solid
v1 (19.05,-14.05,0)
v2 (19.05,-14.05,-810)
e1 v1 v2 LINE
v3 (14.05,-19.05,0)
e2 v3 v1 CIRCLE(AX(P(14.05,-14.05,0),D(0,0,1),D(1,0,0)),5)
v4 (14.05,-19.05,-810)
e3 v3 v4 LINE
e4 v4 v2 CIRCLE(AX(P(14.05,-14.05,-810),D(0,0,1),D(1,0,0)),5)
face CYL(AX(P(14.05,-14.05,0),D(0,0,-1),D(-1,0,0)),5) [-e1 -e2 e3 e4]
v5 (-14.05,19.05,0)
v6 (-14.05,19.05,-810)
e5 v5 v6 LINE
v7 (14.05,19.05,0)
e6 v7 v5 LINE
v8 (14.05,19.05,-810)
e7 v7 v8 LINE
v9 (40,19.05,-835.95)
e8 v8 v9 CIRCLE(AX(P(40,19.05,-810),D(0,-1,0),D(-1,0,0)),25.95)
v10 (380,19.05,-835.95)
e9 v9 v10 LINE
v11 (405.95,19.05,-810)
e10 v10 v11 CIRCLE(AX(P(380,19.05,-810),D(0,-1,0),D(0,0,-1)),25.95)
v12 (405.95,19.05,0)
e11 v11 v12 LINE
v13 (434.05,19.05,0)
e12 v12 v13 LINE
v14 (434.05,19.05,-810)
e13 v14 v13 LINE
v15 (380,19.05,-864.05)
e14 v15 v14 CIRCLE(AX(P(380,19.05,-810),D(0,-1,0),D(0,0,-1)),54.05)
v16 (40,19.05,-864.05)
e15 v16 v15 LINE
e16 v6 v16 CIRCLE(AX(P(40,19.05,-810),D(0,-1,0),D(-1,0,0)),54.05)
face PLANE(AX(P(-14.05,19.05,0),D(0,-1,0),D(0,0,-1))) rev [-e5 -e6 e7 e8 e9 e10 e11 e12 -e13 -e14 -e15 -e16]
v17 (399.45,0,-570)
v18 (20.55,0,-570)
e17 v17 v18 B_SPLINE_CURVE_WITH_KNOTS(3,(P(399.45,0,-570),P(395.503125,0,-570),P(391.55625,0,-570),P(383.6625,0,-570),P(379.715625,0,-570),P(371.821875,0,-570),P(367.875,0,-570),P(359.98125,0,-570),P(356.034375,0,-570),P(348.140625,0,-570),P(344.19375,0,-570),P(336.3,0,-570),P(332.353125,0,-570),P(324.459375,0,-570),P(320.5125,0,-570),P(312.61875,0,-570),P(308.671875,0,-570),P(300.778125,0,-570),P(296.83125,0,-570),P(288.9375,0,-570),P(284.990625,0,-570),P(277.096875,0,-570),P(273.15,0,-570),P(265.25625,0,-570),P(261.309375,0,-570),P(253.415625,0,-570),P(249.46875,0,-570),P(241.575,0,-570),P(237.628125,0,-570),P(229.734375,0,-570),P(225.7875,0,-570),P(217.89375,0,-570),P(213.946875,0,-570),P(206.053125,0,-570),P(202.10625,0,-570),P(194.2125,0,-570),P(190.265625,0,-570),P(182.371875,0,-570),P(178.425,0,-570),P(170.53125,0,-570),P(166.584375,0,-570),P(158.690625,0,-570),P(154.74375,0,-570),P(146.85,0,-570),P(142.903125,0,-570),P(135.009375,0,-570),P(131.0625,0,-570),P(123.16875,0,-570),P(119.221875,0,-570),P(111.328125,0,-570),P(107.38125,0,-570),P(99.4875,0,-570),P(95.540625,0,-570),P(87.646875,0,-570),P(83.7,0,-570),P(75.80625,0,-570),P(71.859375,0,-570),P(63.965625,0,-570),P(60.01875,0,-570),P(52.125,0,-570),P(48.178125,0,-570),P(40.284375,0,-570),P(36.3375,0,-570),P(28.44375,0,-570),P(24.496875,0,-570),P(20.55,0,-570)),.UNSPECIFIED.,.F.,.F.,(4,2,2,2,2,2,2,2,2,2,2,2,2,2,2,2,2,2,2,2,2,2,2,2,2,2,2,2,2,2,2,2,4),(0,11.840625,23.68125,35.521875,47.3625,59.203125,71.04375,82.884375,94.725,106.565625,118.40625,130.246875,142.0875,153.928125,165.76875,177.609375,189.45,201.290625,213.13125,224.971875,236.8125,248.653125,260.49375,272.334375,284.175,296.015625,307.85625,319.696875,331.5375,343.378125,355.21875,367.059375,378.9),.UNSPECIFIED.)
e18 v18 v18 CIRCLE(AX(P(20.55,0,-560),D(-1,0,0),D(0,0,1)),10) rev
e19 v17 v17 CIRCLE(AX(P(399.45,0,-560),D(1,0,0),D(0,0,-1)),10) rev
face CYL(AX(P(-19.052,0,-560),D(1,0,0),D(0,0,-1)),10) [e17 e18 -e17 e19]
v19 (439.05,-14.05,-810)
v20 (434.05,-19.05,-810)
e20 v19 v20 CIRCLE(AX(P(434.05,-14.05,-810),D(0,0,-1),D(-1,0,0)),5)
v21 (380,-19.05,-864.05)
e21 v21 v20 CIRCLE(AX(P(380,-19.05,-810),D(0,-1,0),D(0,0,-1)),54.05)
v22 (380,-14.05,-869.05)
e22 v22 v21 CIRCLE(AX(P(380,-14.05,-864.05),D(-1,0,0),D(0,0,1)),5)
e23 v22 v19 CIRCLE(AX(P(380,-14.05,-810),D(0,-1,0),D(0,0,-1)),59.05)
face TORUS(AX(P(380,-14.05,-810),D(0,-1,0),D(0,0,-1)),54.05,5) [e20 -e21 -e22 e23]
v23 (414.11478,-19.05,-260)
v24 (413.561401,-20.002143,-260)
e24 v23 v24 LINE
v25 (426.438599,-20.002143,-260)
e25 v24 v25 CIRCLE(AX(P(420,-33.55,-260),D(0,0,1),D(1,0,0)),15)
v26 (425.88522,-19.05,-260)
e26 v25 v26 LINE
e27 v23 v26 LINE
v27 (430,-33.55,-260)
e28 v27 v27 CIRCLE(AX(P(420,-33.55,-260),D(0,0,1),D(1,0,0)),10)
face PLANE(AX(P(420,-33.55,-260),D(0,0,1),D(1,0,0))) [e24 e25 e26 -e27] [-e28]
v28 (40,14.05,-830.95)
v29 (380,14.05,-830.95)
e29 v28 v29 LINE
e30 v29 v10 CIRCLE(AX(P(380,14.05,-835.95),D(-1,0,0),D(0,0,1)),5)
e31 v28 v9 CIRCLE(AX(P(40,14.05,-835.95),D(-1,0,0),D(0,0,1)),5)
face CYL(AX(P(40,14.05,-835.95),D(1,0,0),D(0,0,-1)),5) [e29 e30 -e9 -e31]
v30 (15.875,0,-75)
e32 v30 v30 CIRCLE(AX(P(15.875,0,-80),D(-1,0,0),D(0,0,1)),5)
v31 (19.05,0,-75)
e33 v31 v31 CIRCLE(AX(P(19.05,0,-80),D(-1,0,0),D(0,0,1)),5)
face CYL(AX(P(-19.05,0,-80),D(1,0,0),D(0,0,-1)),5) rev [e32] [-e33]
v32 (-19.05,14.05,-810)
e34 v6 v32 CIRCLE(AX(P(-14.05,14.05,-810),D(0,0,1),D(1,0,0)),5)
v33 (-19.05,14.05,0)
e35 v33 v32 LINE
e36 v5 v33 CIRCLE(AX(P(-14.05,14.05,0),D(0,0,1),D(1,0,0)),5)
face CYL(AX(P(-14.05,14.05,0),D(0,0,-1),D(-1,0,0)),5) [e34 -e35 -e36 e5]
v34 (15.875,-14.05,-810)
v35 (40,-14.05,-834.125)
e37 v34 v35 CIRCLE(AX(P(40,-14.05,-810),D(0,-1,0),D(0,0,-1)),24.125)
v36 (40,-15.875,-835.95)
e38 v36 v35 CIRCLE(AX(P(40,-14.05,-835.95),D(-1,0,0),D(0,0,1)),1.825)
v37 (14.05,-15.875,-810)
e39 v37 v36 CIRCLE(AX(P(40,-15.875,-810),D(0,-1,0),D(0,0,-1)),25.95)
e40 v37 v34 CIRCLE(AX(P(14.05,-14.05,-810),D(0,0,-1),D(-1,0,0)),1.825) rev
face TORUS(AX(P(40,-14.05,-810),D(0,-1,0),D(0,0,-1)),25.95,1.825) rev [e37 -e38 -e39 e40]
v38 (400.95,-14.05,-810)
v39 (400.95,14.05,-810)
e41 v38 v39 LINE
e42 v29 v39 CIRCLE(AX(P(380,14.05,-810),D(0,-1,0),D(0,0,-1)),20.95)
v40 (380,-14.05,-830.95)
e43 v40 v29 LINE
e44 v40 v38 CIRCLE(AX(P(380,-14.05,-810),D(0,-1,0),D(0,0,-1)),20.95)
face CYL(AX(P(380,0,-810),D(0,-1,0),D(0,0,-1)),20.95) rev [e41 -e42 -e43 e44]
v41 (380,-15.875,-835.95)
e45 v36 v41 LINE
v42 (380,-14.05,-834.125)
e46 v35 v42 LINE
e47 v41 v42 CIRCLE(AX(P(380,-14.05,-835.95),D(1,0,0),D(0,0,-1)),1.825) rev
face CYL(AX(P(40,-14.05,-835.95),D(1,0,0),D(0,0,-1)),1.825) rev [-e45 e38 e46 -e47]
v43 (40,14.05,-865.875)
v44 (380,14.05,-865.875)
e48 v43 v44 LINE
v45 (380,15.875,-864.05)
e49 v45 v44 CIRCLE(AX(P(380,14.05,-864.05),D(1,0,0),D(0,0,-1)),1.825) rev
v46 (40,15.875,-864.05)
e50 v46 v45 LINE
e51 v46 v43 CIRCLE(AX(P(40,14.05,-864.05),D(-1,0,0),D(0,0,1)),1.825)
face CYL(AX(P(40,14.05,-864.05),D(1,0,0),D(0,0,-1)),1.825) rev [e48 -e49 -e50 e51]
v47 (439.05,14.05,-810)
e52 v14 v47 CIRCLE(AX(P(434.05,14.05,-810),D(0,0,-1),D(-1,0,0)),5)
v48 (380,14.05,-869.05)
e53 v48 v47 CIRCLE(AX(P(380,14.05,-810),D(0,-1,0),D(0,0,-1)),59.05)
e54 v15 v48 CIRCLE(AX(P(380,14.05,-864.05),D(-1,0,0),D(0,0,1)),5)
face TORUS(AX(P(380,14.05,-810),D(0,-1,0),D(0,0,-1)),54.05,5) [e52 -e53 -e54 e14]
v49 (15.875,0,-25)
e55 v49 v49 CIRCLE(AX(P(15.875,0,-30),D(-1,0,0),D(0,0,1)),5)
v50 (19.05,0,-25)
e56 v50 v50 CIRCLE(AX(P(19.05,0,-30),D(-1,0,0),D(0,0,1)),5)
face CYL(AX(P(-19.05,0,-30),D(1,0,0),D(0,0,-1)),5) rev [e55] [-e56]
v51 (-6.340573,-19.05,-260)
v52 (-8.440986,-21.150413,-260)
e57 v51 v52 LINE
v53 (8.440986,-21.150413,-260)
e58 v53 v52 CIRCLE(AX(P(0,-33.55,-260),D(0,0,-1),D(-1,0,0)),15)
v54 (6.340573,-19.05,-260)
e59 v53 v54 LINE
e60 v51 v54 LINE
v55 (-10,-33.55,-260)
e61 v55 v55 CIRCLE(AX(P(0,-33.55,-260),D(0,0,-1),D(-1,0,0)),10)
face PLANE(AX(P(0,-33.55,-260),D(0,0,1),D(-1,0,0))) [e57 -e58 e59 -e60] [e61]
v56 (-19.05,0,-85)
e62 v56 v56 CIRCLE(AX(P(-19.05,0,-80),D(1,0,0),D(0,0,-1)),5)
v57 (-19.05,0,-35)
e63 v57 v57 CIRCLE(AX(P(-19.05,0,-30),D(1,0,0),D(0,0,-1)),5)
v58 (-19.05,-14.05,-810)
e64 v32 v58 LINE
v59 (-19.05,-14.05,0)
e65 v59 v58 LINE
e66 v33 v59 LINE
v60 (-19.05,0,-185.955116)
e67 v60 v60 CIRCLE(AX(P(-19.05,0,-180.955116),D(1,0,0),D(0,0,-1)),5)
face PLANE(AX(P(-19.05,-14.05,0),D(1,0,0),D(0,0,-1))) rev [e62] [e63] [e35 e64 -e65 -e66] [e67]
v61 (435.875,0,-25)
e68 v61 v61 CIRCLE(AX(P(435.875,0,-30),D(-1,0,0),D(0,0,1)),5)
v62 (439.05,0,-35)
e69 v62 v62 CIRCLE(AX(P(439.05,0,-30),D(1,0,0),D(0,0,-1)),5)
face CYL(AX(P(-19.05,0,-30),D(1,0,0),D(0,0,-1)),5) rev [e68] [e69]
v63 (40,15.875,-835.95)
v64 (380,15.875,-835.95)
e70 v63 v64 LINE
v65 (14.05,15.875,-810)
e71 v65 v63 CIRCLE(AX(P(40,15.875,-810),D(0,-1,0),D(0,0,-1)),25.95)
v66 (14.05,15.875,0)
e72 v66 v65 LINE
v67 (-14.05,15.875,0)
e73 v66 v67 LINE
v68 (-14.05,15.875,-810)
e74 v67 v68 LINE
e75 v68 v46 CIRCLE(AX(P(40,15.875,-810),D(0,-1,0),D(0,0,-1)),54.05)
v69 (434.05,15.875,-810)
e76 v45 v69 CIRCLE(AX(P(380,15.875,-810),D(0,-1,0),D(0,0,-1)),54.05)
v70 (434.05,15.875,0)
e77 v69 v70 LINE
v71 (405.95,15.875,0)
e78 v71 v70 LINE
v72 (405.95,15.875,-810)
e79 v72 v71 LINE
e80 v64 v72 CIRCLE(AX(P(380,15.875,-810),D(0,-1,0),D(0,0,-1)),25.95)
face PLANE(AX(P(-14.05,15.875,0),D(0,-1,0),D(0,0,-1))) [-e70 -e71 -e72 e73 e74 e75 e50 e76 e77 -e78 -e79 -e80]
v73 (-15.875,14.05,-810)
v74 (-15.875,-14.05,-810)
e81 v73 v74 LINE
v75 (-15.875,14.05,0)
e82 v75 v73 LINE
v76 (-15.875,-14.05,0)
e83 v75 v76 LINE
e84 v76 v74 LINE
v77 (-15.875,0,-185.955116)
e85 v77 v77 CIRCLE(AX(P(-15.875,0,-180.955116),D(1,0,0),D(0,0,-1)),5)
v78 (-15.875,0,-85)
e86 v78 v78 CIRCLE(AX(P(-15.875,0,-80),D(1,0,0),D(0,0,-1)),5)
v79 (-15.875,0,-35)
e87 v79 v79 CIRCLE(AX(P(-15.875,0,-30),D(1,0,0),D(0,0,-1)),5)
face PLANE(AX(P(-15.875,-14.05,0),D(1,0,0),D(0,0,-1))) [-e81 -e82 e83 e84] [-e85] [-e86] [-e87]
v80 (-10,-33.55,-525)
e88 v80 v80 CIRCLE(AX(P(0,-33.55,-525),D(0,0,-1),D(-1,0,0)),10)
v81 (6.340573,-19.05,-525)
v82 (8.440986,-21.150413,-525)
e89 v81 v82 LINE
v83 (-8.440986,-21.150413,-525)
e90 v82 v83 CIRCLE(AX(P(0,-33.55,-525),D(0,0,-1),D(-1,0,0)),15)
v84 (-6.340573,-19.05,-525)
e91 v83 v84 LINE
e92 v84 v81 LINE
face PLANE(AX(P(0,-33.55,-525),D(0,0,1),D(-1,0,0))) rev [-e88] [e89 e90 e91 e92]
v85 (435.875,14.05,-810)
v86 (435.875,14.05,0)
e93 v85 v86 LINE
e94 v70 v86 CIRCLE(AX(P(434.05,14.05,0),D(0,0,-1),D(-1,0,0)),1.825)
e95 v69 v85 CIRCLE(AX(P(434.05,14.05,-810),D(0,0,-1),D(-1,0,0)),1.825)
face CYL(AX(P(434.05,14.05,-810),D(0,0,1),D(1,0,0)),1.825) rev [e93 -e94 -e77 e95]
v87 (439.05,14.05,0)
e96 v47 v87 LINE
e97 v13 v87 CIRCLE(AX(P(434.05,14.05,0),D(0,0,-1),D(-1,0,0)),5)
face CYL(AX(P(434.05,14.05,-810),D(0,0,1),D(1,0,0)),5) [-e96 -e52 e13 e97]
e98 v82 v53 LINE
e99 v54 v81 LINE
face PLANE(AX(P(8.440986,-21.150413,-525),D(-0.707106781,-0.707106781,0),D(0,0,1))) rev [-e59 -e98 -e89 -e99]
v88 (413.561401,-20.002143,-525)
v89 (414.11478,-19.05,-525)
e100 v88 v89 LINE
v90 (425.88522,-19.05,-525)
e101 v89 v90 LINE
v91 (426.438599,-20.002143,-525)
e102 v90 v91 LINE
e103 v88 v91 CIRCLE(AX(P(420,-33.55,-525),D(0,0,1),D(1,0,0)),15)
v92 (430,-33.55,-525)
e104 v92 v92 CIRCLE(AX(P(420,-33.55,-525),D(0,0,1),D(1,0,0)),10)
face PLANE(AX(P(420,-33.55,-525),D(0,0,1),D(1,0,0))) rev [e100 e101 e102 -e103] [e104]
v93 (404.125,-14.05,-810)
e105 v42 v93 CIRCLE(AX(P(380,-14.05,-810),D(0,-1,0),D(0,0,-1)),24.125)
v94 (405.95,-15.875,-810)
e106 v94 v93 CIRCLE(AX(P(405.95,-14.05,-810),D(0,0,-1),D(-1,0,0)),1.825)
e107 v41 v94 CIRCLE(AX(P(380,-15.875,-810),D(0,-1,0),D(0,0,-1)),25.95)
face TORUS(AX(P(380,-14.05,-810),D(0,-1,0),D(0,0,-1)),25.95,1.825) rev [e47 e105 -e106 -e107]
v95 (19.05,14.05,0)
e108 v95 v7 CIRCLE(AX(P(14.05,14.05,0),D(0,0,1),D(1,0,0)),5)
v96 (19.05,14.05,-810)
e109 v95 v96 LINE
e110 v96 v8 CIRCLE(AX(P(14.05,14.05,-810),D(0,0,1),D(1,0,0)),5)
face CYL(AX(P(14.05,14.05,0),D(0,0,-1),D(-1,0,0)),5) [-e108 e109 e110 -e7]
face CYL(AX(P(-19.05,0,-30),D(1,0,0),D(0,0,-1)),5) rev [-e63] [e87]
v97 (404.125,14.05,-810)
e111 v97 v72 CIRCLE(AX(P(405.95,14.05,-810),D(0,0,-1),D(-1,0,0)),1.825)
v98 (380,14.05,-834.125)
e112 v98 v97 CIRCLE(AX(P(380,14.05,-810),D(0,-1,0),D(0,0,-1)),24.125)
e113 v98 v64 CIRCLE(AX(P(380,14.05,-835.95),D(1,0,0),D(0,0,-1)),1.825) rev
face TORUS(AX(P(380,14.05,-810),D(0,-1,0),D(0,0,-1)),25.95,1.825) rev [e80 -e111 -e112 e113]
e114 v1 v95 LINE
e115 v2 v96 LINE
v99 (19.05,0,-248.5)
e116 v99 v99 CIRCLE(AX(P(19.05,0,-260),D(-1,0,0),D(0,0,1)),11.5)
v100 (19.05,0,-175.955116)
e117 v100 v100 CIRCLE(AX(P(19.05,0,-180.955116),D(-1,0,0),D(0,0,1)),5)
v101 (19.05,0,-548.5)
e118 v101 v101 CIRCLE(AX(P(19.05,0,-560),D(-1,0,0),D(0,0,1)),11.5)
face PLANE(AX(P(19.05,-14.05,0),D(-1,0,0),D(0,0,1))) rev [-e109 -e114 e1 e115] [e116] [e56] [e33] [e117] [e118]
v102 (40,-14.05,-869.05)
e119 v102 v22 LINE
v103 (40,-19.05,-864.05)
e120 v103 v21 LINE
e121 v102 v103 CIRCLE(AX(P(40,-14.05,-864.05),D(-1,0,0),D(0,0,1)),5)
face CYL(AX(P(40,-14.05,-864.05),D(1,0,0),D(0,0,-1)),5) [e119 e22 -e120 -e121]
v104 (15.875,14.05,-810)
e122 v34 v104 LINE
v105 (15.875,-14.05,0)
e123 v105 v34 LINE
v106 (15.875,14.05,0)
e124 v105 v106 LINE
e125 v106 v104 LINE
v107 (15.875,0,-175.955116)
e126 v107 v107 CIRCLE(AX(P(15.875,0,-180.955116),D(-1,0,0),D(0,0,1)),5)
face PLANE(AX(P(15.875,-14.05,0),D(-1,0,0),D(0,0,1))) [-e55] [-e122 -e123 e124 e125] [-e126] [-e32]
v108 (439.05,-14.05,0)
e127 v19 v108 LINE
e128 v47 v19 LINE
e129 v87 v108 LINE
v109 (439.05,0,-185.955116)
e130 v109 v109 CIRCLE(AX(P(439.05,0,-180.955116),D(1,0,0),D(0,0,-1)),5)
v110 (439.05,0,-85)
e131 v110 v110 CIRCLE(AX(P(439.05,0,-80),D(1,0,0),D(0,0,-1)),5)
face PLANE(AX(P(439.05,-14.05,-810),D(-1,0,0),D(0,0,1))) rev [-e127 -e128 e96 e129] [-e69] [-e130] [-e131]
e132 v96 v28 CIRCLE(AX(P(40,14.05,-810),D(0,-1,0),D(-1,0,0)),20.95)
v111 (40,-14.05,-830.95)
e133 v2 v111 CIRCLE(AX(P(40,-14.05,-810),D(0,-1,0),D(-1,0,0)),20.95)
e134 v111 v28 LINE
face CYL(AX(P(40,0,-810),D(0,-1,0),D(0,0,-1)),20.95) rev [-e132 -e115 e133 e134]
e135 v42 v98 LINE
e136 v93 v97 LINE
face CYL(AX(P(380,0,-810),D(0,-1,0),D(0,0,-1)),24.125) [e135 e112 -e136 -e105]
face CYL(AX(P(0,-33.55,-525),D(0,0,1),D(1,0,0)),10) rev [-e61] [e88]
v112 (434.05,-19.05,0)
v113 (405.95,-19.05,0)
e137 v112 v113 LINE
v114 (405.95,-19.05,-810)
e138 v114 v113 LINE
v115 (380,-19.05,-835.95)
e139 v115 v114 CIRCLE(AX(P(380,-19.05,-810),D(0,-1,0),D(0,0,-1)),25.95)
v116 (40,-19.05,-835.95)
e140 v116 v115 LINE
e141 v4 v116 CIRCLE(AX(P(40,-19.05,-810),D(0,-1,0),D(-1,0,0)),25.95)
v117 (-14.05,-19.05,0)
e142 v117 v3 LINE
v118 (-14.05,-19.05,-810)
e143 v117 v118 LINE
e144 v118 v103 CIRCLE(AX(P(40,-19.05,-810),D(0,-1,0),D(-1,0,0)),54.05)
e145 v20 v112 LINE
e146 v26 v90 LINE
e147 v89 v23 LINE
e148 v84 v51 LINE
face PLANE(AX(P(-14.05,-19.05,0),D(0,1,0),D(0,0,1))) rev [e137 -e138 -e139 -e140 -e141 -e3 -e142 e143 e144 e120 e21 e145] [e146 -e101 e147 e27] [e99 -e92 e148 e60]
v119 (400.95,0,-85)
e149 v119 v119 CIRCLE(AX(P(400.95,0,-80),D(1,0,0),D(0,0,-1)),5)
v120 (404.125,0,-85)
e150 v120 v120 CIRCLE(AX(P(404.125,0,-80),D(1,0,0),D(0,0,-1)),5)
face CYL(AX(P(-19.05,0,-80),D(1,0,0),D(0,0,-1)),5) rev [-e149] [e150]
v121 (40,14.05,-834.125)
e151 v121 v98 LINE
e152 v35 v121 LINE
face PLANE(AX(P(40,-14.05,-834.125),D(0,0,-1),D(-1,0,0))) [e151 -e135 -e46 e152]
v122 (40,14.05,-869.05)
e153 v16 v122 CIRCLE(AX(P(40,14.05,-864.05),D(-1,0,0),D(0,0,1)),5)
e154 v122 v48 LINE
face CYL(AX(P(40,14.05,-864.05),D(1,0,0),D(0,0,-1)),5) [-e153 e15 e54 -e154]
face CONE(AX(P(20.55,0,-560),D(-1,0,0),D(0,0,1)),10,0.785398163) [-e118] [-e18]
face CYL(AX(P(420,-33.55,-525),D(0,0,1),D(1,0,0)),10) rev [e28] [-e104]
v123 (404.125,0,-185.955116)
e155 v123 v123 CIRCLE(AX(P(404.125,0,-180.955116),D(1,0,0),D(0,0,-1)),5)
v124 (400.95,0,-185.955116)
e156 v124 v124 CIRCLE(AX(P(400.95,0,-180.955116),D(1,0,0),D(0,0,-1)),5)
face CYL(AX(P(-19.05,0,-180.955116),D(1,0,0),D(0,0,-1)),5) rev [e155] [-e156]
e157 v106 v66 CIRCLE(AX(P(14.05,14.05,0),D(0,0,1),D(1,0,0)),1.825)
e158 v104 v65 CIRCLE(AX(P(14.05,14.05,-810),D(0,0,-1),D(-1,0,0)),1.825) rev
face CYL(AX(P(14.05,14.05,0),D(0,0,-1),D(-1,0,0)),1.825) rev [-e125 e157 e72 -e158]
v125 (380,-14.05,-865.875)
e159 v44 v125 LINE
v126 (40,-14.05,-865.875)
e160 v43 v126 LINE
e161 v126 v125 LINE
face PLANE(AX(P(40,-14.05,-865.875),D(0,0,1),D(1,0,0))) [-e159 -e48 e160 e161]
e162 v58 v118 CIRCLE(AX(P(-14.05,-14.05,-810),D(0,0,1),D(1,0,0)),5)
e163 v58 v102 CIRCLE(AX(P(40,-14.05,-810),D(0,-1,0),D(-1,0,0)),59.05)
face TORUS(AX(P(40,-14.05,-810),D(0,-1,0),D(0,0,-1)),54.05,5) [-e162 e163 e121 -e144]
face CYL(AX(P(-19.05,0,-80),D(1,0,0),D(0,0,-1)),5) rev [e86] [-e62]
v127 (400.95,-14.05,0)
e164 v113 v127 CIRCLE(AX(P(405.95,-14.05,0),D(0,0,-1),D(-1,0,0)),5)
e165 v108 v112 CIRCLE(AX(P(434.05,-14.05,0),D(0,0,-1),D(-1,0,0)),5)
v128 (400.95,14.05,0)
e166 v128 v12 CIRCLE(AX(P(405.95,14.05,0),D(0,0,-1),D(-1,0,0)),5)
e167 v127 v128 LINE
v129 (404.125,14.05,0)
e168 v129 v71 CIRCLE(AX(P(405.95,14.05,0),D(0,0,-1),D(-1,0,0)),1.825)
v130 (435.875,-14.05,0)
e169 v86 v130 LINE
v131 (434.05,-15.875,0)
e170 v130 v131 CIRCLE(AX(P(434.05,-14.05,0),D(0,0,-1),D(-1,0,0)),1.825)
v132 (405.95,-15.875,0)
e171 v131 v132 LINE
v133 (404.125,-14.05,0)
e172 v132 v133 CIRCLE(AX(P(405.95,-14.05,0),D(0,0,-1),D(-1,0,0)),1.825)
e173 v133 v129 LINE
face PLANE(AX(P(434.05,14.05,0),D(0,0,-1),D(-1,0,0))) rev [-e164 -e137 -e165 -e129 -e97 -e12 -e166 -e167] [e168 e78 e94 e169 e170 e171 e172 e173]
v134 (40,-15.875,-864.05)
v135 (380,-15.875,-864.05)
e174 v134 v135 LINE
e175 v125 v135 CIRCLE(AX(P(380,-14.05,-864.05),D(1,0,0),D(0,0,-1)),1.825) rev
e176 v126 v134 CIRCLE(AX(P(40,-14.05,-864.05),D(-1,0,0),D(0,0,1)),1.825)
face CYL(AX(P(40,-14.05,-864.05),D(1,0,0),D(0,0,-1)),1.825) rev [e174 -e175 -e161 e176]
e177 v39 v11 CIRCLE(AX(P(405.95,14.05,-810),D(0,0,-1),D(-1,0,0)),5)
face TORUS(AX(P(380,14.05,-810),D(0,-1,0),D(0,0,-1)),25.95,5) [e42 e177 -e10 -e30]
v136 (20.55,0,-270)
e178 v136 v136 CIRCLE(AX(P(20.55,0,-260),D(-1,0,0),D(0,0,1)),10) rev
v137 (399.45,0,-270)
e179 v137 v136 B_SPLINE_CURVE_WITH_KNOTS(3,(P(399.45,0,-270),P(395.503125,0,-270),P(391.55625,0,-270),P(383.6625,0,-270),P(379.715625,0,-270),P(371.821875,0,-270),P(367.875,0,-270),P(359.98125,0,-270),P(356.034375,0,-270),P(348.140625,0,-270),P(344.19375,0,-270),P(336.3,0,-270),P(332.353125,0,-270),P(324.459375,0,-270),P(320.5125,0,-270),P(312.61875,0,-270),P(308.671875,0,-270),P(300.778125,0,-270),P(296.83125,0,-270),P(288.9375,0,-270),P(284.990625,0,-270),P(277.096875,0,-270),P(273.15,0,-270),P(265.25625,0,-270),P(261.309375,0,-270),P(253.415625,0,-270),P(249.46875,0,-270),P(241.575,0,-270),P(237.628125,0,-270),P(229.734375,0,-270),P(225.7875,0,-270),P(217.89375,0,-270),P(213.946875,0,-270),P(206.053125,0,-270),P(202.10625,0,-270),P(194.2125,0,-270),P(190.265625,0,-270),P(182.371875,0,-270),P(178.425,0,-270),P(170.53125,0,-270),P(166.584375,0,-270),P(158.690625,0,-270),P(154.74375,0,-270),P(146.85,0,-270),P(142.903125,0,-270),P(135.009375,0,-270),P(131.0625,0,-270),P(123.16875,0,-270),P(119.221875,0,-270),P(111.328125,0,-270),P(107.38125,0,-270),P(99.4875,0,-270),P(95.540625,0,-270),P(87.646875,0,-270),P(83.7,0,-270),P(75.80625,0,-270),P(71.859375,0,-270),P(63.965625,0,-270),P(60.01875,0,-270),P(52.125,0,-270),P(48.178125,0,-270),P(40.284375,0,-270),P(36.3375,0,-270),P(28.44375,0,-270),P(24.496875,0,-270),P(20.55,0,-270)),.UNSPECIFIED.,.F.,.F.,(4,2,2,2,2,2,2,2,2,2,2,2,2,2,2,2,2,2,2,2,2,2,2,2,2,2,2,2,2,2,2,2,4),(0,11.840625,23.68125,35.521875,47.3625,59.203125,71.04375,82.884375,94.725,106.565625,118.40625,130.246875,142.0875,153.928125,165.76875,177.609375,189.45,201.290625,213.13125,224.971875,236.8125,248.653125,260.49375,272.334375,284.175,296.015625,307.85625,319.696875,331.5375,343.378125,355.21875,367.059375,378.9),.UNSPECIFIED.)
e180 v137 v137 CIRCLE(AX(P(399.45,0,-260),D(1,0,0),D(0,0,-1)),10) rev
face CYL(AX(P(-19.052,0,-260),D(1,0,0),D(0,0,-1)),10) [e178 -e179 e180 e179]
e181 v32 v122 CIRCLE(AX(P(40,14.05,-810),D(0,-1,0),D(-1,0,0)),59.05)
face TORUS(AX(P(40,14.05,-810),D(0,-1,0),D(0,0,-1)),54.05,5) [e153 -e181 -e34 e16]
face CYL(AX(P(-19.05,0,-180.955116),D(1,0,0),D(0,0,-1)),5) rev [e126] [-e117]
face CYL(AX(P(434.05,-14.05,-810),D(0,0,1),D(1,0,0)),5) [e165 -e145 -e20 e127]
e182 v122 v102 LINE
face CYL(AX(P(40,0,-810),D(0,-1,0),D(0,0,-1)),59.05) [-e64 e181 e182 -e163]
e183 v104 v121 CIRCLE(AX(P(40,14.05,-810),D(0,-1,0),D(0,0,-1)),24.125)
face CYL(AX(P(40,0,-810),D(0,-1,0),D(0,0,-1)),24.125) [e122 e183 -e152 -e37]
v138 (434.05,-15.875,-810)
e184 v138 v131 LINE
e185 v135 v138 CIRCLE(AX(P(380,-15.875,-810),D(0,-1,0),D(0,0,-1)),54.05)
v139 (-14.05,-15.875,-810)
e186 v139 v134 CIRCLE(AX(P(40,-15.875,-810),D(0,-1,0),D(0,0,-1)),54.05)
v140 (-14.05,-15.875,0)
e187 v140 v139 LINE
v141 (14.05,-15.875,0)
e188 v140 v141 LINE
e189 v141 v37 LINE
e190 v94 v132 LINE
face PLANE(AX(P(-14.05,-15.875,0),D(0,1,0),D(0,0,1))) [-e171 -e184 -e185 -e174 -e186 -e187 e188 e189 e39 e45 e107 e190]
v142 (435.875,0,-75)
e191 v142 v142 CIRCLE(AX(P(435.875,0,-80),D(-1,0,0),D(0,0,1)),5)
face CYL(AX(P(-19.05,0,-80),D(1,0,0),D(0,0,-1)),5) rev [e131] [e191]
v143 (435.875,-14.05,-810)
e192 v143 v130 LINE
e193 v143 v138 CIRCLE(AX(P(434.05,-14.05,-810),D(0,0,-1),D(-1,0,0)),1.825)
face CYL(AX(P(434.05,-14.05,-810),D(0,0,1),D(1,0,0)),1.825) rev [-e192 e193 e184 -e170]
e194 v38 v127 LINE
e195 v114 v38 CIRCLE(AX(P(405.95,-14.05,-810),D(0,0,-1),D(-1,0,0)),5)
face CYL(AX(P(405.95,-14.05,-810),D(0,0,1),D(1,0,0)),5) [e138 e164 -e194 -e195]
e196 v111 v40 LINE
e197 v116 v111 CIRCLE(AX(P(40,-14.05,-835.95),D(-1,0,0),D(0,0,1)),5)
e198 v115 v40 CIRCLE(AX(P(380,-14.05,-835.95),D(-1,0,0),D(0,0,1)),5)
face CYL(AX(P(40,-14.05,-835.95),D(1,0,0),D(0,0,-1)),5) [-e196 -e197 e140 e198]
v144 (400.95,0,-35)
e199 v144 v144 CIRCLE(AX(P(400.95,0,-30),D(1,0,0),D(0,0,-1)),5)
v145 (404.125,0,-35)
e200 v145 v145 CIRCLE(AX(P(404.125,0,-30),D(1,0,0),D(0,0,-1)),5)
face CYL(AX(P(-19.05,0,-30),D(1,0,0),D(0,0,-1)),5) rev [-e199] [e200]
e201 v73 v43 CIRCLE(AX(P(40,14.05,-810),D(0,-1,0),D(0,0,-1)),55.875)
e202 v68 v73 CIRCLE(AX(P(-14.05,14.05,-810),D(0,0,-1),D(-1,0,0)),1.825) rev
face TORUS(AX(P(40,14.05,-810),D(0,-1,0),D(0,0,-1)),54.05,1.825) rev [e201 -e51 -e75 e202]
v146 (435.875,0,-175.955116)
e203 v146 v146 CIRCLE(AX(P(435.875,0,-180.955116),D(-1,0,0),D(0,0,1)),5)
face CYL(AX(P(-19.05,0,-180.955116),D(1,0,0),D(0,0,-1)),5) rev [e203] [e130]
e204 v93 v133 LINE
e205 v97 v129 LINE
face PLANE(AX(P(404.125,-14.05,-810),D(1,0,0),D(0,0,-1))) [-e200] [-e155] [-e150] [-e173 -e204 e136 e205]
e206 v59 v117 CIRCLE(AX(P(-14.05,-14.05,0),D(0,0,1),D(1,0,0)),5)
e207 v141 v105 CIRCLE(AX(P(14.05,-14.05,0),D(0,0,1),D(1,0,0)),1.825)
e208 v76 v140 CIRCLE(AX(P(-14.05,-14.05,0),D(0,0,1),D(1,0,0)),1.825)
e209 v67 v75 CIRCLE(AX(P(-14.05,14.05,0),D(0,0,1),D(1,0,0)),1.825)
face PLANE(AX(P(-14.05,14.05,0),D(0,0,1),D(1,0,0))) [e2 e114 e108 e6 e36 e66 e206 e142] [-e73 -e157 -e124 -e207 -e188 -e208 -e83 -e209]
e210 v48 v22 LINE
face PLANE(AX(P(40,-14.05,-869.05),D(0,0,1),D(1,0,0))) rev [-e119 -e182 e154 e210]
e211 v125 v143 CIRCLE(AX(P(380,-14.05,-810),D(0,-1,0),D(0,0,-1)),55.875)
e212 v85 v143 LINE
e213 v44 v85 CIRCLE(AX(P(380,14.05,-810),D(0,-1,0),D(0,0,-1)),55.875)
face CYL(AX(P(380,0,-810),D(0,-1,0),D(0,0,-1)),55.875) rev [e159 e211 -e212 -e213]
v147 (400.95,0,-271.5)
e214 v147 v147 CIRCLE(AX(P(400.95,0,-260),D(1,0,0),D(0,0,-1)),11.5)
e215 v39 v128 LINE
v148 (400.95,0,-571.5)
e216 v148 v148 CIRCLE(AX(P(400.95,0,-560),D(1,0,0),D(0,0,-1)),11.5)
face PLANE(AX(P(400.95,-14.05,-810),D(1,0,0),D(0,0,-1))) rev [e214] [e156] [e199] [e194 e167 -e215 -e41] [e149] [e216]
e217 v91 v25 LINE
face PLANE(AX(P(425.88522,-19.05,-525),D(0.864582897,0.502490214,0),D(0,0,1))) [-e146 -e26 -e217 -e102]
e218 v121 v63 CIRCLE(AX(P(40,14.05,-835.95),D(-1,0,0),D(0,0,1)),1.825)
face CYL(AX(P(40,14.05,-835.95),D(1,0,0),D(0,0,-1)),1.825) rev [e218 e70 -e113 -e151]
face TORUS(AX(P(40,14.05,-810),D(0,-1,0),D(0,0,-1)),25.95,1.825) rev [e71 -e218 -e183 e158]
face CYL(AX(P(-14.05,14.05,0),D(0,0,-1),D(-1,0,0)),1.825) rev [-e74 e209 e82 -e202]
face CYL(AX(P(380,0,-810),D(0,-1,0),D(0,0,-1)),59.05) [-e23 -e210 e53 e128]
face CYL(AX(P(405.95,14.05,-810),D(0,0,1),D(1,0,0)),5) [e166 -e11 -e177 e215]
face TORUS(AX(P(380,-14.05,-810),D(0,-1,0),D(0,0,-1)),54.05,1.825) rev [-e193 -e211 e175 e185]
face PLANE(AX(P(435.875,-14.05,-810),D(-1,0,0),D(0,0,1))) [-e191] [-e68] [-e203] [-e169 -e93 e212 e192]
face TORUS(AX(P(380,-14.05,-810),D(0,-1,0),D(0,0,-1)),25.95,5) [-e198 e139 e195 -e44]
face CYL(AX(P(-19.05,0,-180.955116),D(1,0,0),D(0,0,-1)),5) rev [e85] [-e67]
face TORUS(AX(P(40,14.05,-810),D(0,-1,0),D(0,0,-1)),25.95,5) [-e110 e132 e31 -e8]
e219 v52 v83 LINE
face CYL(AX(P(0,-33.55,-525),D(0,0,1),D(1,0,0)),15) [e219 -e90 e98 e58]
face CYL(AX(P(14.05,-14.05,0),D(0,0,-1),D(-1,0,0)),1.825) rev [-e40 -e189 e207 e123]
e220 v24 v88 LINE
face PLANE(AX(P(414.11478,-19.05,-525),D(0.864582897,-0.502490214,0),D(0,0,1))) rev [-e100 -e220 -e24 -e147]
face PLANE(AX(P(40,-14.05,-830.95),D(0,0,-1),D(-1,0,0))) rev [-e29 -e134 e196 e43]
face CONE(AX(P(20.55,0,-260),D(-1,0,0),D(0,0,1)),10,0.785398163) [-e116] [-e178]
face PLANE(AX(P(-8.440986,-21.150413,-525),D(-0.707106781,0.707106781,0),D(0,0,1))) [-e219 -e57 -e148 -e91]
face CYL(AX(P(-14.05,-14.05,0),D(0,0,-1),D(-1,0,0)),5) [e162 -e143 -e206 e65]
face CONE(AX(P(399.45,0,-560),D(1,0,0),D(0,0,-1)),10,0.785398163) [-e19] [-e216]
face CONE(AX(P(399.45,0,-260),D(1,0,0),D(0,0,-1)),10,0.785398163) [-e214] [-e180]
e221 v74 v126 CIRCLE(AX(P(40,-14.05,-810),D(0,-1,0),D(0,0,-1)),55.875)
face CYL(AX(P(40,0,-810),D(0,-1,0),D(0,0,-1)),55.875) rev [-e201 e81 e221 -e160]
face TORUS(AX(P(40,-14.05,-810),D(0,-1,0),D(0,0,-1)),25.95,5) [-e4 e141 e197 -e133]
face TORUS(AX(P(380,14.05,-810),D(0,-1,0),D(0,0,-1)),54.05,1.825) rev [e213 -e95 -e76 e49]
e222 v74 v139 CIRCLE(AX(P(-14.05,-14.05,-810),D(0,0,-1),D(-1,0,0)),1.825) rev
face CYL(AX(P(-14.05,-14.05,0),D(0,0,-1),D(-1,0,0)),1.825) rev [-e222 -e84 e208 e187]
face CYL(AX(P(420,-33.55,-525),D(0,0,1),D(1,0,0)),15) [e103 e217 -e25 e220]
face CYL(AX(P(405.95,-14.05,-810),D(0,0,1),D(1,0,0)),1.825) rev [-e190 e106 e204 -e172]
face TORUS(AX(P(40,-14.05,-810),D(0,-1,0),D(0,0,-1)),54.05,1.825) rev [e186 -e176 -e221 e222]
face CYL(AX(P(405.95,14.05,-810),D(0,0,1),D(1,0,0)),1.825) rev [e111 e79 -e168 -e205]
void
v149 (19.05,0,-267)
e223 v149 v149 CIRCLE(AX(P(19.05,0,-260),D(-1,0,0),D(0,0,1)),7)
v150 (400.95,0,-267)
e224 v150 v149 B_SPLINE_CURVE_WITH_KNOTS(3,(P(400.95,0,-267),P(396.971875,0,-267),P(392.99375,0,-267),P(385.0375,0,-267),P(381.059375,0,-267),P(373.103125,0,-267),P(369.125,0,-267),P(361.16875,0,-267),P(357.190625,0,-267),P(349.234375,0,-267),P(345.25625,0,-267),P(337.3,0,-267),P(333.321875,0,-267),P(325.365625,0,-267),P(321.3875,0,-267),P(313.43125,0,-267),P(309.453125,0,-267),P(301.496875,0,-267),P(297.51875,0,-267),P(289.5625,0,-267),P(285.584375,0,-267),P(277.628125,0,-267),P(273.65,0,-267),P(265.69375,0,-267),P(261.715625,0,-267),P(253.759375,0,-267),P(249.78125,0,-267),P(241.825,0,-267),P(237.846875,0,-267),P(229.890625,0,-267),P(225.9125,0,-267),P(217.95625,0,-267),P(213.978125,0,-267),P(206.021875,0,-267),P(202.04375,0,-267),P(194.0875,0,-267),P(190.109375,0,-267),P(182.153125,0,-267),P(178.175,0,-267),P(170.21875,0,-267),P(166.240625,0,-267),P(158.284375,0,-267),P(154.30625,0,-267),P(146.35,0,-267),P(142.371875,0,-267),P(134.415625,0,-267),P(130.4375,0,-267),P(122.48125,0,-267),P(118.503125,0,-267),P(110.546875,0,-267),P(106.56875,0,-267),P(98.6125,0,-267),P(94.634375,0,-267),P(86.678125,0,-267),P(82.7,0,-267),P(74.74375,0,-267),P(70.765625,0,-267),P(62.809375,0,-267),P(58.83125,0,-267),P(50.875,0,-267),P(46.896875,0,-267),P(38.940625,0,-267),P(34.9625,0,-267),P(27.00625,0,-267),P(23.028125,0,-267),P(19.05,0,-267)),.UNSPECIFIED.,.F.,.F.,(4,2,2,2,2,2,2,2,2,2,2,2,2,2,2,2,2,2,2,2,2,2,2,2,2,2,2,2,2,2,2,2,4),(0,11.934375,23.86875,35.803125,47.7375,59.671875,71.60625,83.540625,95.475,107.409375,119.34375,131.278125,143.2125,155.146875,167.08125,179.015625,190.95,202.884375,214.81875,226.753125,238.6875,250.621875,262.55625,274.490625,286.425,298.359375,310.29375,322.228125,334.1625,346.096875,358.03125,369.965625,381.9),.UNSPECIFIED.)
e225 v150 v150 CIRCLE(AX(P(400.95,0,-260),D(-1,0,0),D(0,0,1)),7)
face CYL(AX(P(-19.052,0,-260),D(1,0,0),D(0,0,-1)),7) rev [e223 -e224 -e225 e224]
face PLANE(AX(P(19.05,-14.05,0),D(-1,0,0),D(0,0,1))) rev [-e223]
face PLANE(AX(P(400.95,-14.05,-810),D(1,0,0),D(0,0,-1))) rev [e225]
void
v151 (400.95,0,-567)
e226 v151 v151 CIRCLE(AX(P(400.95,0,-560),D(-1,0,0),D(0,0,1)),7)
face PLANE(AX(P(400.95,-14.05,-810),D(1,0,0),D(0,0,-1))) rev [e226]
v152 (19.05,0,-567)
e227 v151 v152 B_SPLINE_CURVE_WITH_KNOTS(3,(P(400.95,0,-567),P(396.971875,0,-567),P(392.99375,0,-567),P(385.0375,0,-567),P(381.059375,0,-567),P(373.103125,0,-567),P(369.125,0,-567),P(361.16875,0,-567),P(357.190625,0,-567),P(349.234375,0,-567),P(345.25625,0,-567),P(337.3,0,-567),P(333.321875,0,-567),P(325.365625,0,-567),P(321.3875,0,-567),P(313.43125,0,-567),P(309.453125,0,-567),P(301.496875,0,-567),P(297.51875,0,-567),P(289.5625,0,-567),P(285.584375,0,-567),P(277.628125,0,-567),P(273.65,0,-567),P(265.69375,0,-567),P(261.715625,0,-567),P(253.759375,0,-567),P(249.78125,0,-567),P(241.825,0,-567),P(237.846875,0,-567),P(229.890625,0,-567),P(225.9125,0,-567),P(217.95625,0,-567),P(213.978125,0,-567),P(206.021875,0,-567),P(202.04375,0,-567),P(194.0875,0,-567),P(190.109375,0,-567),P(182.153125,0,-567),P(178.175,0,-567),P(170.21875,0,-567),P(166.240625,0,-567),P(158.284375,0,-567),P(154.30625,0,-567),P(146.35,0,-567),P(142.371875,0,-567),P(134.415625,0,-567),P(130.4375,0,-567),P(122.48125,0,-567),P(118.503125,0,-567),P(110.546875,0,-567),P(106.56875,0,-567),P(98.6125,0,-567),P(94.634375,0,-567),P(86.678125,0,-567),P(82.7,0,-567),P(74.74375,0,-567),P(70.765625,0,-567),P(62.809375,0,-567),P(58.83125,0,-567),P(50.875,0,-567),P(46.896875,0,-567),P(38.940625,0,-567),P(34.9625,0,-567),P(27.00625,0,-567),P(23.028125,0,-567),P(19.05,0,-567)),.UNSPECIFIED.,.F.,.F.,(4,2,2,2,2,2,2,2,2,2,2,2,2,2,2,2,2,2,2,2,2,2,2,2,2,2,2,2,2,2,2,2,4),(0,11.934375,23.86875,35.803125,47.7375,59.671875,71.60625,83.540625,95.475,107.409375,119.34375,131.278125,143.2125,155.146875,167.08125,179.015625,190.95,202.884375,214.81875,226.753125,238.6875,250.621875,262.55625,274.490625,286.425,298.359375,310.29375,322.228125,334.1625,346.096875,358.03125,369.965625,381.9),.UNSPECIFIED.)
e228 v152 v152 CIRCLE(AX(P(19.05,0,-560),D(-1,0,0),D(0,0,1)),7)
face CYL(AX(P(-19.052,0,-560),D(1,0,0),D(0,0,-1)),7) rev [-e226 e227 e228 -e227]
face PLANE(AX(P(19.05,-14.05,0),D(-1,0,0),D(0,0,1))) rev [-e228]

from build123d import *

# Parameters (mm, degrees)
CUT_EXTRUDE2_DEPTH      = 974.845833675
CUT_EXTRUDE2_DEPTH_BACK = 974.845833675
SKETCH4_R               = 5
BOSS_EXTRUDE1_REACH     = 967.407
SKETCH10_R              = 10
SKETCH10_R_2            = 7
CHAMFER1_SIZE           = 1.5
SKETCH24_R              = 15
SKETCH24_R_2            = 10
BOSS_EXTRUDE2_DEPTH     = 265
CHAMFER2_SIZE           = 2.044647147
MIRROR1_START           = -525
MIRROR1_OUTLINE_R       = 10
MIRROR1_DEPTH           = 265


with BuildPart() as part:
    # Sweep-Thin1: sweep along a path in Sketch1
    with BuildLine(Plane(origin=(0, 0, 0), x_dir=(1, 0, 0), z_dir=(0, 1, 0))) as sweep_thin1_path:
        Line((0, 0), (0, 810))
        ThreePointArc((0, 810), (11.715728753, 838.284271247), (40, 850))
        Line((40, 850), (380, 850))
        ThreePointArc((380, 850), (408.284271247, 838.284271247), (420, 810))
        Line((420, 810), (420, 0))
    # Sketch3 → Sweep-Thin1 (sweep)
    with BuildSketch(Plane.XY):
        with BuildLine():
            Line((14.05, 19.05), (-14.05, 19.05))
            ThreePointArc((-14.05, 19.05), (-17.585533906, 17.585533906), (-19.05, 14.05))
            Line((-19.05, 14.05), (-19.05, -14.05))
            ThreePointArc((-19.05, -14.05), (-17.585533906, -17.585533906), (-14.05, -19.05))
            Line((-14.05, -19.05), (14.05, -19.05))
            ThreePointArc((14.05, -19.05), (17.585533906, -17.585533906), (19.05, -14.05))
            Line((19.05, -14.05), (19.05, 14.05))
            ThreePointArc((19.05, 14.05), (17.585533906, 17.585533906), (14.05, 19.05))
        make_face()
        with BuildLine():
            Line((14.05, 15.875), (-14.05, 15.875))
            ThreePointArc((-14.05, 15.875), (-15.340469876, 15.340469876), (-15.875, 14.05))
            Line((-15.875, 14.05), (-15.875, -14.05))
            ThreePointArc((-15.875, -14.05), (-15.340469876, -15.340469876), (-14.05, -15.875))
            Line((-14.05, -15.875), (14.05, -15.875))
            ThreePointArc((14.05, -15.875), (15.340469876, -15.340469876), (15.875, -14.05))
            Line((15.875, -14.05), (15.875, 14.05))
            ThreePointArc((15.875, 14.05), (15.340469876, 15.340469876), (14.05, 15.875))
        make_face(mode=Mode.SUBTRACT)
    sweep(path=sweep_thin1_path.line)

    # Sketch4 → Cut-Extrude2 (cut, two sides: drawn at the far end of the back side and taken through both)
    with BuildSketch(Plane(origin=(0, 0, 0), x_dir=(0, 0, -1), z_dir=(1, 0, 0)).offset(-CUT_EXTRUDE2_DEPTH_BACK)):
        with Locations((30, 0)):
            Circle(SKETCH4_R)
        with Locations((80, 0)):
            Circle(SKETCH4_R)
        with Locations((180.955115779, 0)):
            Circle(SKETCH4_R)
    extrude(amount=CUT_EXTRUDE2_DEPTH + CUT_EXTRUDE2_DEPTH_BACK, mode=Mode.SUBTRACT)

    # Sketch10 → Boss-Extrude1 (add, up to next)
    with BuildSketch(Plane.ZY.offset(-400.95), mode=Mode.PRIVATE) as boss_extrude1_sk1:
        with Locations(Location((-560, 0, 0), (0, 0, 180))):
            Circle(SKETCH10_R)
        with Locations(Location((-560, 0, 0), (0, 0, 180))):
            Circle(SKETCH10_R_2, mode=Mode.SUBTRACT)
    boss_extrude1_tool1 = extrude(boss_extrude1_sk1.sketch, amount=BOSS_EXTRUDE1_REACH, mode=Mode.PRIVATE) - part.part
    # Sketch10 → Boss-Extrude1 (add, up to next)
    with BuildSketch(Plane.ZY.offset(-400.95), mode=Mode.PRIVATE) as boss_extrude1_sk2:
        with Locations(Location((-260, 0, 0), (0, 0, 180))):
            Circle(SKETCH10_R)
        with Locations(Location((-260, 0, 0), (0, 0, 180))):
            Circle(SKETCH10_R_2, mode=Mode.SUBTRACT)
    boss_extrude1_tool2 = extrude(boss_extrude1_sk2.sketch, amount=BOSS_EXTRUDE1_REACH, mode=Mode.PRIVATE) - part.part
    add(boss_extrude1_tool1.solids().sort_by_distance((400.95, 0, -550.282843))[0])
    add(boss_extrude1_tool2.solids().sort_by_distance((400.95, 0, -250.282843))[0])

    # Chamfer1
    chamfer1_edges = [part.edges().sort_by_distance(p)[0] for p in [
        (400.95, 0, -550),
        (19.05, 0, -550),
        (400.95, 0, -250),
        (19.05, 0, -250),
    ]]
    chamfer(chamfer1_edges, length=CHAMFER1_SIZE)

    # Sketch24 → Boss-Extrude2 (add)
    with BuildSketch(Plane.XY.offset(-260)):
        with Locations((420, -33.55)):
            Circle(SKETCH24_R)
        with Locations((420, -33.55)):
            Circle(SKETCH24_R_2, mode=Mode.SUBTRACT)
    extrude(amount=-BOSS_EXTRUDE2_DEPTH)

    # Chamfer2
    # the kernel refuses this chamfer: 2.5, 2.044647147 mm, written as the material it adds along each edge
    with BuildSketch(Plane(origin=(423.840572874, -19.05, -525), x_dir=(1, 0, 0), z_dir=(0, 0, 1))) as chamfer2_piece_1:
        with BuildLine():
            Line((CHAMFER2_SIZE, 0), (2.598026583, -0.952142714))
            ThreePointArc((2.598026583, -0.952142714), (1.357346607, -0.429405376), (0, 0))
            Line((0, 0), (CHAMFER2_SIZE, 0))
        make_face()
    extrude(amount=265)
    with BuildSketch(Plane(origin=(416.159427126, -19.05, -525), x_dir=(-1, 0, 0), z_dir=(0, 0, 1))) as chamfer2_piece_2:
        with BuildLine():
            Line((CHAMFER2_SIZE, 0), (2.598026583, 0.952142714))
            ThreePointArc((2.598026583, 0.952142714), (1.357346607, 0.429405376), (0, 0))
            Line((0, 0), (CHAMFER2_SIZE, 0))
        make_face()
    extrude(amount=265)

    # Mirror1: read off the stored shape, not the designer's step
    # Mirror1 outline → Mirror1 (add)
    with BuildSketch(Plane.XY.offset(MIRROR1_START)):
        with BuildLine():
            Line((-6.340572874, -19.05), (-8.440985911, -21.150413037))
            ThreePointArc((-8.440985911, -21.150413037), (0, -48.55), (8.440985911, -21.150413037))
            Line((8.440985911, -21.150413037), (6.340572874, -19.05))
            Line((6.340572874, -19.05), (-6.340572874, -19.05))
        make_face()
        with Locations((0, -33.55)):
            Circle(MIRROR1_OUTLINE_R, mode=Mode.SUBTRACT)
    extrude(amount=MIRROR1_DEPTH)


solid = part.part
